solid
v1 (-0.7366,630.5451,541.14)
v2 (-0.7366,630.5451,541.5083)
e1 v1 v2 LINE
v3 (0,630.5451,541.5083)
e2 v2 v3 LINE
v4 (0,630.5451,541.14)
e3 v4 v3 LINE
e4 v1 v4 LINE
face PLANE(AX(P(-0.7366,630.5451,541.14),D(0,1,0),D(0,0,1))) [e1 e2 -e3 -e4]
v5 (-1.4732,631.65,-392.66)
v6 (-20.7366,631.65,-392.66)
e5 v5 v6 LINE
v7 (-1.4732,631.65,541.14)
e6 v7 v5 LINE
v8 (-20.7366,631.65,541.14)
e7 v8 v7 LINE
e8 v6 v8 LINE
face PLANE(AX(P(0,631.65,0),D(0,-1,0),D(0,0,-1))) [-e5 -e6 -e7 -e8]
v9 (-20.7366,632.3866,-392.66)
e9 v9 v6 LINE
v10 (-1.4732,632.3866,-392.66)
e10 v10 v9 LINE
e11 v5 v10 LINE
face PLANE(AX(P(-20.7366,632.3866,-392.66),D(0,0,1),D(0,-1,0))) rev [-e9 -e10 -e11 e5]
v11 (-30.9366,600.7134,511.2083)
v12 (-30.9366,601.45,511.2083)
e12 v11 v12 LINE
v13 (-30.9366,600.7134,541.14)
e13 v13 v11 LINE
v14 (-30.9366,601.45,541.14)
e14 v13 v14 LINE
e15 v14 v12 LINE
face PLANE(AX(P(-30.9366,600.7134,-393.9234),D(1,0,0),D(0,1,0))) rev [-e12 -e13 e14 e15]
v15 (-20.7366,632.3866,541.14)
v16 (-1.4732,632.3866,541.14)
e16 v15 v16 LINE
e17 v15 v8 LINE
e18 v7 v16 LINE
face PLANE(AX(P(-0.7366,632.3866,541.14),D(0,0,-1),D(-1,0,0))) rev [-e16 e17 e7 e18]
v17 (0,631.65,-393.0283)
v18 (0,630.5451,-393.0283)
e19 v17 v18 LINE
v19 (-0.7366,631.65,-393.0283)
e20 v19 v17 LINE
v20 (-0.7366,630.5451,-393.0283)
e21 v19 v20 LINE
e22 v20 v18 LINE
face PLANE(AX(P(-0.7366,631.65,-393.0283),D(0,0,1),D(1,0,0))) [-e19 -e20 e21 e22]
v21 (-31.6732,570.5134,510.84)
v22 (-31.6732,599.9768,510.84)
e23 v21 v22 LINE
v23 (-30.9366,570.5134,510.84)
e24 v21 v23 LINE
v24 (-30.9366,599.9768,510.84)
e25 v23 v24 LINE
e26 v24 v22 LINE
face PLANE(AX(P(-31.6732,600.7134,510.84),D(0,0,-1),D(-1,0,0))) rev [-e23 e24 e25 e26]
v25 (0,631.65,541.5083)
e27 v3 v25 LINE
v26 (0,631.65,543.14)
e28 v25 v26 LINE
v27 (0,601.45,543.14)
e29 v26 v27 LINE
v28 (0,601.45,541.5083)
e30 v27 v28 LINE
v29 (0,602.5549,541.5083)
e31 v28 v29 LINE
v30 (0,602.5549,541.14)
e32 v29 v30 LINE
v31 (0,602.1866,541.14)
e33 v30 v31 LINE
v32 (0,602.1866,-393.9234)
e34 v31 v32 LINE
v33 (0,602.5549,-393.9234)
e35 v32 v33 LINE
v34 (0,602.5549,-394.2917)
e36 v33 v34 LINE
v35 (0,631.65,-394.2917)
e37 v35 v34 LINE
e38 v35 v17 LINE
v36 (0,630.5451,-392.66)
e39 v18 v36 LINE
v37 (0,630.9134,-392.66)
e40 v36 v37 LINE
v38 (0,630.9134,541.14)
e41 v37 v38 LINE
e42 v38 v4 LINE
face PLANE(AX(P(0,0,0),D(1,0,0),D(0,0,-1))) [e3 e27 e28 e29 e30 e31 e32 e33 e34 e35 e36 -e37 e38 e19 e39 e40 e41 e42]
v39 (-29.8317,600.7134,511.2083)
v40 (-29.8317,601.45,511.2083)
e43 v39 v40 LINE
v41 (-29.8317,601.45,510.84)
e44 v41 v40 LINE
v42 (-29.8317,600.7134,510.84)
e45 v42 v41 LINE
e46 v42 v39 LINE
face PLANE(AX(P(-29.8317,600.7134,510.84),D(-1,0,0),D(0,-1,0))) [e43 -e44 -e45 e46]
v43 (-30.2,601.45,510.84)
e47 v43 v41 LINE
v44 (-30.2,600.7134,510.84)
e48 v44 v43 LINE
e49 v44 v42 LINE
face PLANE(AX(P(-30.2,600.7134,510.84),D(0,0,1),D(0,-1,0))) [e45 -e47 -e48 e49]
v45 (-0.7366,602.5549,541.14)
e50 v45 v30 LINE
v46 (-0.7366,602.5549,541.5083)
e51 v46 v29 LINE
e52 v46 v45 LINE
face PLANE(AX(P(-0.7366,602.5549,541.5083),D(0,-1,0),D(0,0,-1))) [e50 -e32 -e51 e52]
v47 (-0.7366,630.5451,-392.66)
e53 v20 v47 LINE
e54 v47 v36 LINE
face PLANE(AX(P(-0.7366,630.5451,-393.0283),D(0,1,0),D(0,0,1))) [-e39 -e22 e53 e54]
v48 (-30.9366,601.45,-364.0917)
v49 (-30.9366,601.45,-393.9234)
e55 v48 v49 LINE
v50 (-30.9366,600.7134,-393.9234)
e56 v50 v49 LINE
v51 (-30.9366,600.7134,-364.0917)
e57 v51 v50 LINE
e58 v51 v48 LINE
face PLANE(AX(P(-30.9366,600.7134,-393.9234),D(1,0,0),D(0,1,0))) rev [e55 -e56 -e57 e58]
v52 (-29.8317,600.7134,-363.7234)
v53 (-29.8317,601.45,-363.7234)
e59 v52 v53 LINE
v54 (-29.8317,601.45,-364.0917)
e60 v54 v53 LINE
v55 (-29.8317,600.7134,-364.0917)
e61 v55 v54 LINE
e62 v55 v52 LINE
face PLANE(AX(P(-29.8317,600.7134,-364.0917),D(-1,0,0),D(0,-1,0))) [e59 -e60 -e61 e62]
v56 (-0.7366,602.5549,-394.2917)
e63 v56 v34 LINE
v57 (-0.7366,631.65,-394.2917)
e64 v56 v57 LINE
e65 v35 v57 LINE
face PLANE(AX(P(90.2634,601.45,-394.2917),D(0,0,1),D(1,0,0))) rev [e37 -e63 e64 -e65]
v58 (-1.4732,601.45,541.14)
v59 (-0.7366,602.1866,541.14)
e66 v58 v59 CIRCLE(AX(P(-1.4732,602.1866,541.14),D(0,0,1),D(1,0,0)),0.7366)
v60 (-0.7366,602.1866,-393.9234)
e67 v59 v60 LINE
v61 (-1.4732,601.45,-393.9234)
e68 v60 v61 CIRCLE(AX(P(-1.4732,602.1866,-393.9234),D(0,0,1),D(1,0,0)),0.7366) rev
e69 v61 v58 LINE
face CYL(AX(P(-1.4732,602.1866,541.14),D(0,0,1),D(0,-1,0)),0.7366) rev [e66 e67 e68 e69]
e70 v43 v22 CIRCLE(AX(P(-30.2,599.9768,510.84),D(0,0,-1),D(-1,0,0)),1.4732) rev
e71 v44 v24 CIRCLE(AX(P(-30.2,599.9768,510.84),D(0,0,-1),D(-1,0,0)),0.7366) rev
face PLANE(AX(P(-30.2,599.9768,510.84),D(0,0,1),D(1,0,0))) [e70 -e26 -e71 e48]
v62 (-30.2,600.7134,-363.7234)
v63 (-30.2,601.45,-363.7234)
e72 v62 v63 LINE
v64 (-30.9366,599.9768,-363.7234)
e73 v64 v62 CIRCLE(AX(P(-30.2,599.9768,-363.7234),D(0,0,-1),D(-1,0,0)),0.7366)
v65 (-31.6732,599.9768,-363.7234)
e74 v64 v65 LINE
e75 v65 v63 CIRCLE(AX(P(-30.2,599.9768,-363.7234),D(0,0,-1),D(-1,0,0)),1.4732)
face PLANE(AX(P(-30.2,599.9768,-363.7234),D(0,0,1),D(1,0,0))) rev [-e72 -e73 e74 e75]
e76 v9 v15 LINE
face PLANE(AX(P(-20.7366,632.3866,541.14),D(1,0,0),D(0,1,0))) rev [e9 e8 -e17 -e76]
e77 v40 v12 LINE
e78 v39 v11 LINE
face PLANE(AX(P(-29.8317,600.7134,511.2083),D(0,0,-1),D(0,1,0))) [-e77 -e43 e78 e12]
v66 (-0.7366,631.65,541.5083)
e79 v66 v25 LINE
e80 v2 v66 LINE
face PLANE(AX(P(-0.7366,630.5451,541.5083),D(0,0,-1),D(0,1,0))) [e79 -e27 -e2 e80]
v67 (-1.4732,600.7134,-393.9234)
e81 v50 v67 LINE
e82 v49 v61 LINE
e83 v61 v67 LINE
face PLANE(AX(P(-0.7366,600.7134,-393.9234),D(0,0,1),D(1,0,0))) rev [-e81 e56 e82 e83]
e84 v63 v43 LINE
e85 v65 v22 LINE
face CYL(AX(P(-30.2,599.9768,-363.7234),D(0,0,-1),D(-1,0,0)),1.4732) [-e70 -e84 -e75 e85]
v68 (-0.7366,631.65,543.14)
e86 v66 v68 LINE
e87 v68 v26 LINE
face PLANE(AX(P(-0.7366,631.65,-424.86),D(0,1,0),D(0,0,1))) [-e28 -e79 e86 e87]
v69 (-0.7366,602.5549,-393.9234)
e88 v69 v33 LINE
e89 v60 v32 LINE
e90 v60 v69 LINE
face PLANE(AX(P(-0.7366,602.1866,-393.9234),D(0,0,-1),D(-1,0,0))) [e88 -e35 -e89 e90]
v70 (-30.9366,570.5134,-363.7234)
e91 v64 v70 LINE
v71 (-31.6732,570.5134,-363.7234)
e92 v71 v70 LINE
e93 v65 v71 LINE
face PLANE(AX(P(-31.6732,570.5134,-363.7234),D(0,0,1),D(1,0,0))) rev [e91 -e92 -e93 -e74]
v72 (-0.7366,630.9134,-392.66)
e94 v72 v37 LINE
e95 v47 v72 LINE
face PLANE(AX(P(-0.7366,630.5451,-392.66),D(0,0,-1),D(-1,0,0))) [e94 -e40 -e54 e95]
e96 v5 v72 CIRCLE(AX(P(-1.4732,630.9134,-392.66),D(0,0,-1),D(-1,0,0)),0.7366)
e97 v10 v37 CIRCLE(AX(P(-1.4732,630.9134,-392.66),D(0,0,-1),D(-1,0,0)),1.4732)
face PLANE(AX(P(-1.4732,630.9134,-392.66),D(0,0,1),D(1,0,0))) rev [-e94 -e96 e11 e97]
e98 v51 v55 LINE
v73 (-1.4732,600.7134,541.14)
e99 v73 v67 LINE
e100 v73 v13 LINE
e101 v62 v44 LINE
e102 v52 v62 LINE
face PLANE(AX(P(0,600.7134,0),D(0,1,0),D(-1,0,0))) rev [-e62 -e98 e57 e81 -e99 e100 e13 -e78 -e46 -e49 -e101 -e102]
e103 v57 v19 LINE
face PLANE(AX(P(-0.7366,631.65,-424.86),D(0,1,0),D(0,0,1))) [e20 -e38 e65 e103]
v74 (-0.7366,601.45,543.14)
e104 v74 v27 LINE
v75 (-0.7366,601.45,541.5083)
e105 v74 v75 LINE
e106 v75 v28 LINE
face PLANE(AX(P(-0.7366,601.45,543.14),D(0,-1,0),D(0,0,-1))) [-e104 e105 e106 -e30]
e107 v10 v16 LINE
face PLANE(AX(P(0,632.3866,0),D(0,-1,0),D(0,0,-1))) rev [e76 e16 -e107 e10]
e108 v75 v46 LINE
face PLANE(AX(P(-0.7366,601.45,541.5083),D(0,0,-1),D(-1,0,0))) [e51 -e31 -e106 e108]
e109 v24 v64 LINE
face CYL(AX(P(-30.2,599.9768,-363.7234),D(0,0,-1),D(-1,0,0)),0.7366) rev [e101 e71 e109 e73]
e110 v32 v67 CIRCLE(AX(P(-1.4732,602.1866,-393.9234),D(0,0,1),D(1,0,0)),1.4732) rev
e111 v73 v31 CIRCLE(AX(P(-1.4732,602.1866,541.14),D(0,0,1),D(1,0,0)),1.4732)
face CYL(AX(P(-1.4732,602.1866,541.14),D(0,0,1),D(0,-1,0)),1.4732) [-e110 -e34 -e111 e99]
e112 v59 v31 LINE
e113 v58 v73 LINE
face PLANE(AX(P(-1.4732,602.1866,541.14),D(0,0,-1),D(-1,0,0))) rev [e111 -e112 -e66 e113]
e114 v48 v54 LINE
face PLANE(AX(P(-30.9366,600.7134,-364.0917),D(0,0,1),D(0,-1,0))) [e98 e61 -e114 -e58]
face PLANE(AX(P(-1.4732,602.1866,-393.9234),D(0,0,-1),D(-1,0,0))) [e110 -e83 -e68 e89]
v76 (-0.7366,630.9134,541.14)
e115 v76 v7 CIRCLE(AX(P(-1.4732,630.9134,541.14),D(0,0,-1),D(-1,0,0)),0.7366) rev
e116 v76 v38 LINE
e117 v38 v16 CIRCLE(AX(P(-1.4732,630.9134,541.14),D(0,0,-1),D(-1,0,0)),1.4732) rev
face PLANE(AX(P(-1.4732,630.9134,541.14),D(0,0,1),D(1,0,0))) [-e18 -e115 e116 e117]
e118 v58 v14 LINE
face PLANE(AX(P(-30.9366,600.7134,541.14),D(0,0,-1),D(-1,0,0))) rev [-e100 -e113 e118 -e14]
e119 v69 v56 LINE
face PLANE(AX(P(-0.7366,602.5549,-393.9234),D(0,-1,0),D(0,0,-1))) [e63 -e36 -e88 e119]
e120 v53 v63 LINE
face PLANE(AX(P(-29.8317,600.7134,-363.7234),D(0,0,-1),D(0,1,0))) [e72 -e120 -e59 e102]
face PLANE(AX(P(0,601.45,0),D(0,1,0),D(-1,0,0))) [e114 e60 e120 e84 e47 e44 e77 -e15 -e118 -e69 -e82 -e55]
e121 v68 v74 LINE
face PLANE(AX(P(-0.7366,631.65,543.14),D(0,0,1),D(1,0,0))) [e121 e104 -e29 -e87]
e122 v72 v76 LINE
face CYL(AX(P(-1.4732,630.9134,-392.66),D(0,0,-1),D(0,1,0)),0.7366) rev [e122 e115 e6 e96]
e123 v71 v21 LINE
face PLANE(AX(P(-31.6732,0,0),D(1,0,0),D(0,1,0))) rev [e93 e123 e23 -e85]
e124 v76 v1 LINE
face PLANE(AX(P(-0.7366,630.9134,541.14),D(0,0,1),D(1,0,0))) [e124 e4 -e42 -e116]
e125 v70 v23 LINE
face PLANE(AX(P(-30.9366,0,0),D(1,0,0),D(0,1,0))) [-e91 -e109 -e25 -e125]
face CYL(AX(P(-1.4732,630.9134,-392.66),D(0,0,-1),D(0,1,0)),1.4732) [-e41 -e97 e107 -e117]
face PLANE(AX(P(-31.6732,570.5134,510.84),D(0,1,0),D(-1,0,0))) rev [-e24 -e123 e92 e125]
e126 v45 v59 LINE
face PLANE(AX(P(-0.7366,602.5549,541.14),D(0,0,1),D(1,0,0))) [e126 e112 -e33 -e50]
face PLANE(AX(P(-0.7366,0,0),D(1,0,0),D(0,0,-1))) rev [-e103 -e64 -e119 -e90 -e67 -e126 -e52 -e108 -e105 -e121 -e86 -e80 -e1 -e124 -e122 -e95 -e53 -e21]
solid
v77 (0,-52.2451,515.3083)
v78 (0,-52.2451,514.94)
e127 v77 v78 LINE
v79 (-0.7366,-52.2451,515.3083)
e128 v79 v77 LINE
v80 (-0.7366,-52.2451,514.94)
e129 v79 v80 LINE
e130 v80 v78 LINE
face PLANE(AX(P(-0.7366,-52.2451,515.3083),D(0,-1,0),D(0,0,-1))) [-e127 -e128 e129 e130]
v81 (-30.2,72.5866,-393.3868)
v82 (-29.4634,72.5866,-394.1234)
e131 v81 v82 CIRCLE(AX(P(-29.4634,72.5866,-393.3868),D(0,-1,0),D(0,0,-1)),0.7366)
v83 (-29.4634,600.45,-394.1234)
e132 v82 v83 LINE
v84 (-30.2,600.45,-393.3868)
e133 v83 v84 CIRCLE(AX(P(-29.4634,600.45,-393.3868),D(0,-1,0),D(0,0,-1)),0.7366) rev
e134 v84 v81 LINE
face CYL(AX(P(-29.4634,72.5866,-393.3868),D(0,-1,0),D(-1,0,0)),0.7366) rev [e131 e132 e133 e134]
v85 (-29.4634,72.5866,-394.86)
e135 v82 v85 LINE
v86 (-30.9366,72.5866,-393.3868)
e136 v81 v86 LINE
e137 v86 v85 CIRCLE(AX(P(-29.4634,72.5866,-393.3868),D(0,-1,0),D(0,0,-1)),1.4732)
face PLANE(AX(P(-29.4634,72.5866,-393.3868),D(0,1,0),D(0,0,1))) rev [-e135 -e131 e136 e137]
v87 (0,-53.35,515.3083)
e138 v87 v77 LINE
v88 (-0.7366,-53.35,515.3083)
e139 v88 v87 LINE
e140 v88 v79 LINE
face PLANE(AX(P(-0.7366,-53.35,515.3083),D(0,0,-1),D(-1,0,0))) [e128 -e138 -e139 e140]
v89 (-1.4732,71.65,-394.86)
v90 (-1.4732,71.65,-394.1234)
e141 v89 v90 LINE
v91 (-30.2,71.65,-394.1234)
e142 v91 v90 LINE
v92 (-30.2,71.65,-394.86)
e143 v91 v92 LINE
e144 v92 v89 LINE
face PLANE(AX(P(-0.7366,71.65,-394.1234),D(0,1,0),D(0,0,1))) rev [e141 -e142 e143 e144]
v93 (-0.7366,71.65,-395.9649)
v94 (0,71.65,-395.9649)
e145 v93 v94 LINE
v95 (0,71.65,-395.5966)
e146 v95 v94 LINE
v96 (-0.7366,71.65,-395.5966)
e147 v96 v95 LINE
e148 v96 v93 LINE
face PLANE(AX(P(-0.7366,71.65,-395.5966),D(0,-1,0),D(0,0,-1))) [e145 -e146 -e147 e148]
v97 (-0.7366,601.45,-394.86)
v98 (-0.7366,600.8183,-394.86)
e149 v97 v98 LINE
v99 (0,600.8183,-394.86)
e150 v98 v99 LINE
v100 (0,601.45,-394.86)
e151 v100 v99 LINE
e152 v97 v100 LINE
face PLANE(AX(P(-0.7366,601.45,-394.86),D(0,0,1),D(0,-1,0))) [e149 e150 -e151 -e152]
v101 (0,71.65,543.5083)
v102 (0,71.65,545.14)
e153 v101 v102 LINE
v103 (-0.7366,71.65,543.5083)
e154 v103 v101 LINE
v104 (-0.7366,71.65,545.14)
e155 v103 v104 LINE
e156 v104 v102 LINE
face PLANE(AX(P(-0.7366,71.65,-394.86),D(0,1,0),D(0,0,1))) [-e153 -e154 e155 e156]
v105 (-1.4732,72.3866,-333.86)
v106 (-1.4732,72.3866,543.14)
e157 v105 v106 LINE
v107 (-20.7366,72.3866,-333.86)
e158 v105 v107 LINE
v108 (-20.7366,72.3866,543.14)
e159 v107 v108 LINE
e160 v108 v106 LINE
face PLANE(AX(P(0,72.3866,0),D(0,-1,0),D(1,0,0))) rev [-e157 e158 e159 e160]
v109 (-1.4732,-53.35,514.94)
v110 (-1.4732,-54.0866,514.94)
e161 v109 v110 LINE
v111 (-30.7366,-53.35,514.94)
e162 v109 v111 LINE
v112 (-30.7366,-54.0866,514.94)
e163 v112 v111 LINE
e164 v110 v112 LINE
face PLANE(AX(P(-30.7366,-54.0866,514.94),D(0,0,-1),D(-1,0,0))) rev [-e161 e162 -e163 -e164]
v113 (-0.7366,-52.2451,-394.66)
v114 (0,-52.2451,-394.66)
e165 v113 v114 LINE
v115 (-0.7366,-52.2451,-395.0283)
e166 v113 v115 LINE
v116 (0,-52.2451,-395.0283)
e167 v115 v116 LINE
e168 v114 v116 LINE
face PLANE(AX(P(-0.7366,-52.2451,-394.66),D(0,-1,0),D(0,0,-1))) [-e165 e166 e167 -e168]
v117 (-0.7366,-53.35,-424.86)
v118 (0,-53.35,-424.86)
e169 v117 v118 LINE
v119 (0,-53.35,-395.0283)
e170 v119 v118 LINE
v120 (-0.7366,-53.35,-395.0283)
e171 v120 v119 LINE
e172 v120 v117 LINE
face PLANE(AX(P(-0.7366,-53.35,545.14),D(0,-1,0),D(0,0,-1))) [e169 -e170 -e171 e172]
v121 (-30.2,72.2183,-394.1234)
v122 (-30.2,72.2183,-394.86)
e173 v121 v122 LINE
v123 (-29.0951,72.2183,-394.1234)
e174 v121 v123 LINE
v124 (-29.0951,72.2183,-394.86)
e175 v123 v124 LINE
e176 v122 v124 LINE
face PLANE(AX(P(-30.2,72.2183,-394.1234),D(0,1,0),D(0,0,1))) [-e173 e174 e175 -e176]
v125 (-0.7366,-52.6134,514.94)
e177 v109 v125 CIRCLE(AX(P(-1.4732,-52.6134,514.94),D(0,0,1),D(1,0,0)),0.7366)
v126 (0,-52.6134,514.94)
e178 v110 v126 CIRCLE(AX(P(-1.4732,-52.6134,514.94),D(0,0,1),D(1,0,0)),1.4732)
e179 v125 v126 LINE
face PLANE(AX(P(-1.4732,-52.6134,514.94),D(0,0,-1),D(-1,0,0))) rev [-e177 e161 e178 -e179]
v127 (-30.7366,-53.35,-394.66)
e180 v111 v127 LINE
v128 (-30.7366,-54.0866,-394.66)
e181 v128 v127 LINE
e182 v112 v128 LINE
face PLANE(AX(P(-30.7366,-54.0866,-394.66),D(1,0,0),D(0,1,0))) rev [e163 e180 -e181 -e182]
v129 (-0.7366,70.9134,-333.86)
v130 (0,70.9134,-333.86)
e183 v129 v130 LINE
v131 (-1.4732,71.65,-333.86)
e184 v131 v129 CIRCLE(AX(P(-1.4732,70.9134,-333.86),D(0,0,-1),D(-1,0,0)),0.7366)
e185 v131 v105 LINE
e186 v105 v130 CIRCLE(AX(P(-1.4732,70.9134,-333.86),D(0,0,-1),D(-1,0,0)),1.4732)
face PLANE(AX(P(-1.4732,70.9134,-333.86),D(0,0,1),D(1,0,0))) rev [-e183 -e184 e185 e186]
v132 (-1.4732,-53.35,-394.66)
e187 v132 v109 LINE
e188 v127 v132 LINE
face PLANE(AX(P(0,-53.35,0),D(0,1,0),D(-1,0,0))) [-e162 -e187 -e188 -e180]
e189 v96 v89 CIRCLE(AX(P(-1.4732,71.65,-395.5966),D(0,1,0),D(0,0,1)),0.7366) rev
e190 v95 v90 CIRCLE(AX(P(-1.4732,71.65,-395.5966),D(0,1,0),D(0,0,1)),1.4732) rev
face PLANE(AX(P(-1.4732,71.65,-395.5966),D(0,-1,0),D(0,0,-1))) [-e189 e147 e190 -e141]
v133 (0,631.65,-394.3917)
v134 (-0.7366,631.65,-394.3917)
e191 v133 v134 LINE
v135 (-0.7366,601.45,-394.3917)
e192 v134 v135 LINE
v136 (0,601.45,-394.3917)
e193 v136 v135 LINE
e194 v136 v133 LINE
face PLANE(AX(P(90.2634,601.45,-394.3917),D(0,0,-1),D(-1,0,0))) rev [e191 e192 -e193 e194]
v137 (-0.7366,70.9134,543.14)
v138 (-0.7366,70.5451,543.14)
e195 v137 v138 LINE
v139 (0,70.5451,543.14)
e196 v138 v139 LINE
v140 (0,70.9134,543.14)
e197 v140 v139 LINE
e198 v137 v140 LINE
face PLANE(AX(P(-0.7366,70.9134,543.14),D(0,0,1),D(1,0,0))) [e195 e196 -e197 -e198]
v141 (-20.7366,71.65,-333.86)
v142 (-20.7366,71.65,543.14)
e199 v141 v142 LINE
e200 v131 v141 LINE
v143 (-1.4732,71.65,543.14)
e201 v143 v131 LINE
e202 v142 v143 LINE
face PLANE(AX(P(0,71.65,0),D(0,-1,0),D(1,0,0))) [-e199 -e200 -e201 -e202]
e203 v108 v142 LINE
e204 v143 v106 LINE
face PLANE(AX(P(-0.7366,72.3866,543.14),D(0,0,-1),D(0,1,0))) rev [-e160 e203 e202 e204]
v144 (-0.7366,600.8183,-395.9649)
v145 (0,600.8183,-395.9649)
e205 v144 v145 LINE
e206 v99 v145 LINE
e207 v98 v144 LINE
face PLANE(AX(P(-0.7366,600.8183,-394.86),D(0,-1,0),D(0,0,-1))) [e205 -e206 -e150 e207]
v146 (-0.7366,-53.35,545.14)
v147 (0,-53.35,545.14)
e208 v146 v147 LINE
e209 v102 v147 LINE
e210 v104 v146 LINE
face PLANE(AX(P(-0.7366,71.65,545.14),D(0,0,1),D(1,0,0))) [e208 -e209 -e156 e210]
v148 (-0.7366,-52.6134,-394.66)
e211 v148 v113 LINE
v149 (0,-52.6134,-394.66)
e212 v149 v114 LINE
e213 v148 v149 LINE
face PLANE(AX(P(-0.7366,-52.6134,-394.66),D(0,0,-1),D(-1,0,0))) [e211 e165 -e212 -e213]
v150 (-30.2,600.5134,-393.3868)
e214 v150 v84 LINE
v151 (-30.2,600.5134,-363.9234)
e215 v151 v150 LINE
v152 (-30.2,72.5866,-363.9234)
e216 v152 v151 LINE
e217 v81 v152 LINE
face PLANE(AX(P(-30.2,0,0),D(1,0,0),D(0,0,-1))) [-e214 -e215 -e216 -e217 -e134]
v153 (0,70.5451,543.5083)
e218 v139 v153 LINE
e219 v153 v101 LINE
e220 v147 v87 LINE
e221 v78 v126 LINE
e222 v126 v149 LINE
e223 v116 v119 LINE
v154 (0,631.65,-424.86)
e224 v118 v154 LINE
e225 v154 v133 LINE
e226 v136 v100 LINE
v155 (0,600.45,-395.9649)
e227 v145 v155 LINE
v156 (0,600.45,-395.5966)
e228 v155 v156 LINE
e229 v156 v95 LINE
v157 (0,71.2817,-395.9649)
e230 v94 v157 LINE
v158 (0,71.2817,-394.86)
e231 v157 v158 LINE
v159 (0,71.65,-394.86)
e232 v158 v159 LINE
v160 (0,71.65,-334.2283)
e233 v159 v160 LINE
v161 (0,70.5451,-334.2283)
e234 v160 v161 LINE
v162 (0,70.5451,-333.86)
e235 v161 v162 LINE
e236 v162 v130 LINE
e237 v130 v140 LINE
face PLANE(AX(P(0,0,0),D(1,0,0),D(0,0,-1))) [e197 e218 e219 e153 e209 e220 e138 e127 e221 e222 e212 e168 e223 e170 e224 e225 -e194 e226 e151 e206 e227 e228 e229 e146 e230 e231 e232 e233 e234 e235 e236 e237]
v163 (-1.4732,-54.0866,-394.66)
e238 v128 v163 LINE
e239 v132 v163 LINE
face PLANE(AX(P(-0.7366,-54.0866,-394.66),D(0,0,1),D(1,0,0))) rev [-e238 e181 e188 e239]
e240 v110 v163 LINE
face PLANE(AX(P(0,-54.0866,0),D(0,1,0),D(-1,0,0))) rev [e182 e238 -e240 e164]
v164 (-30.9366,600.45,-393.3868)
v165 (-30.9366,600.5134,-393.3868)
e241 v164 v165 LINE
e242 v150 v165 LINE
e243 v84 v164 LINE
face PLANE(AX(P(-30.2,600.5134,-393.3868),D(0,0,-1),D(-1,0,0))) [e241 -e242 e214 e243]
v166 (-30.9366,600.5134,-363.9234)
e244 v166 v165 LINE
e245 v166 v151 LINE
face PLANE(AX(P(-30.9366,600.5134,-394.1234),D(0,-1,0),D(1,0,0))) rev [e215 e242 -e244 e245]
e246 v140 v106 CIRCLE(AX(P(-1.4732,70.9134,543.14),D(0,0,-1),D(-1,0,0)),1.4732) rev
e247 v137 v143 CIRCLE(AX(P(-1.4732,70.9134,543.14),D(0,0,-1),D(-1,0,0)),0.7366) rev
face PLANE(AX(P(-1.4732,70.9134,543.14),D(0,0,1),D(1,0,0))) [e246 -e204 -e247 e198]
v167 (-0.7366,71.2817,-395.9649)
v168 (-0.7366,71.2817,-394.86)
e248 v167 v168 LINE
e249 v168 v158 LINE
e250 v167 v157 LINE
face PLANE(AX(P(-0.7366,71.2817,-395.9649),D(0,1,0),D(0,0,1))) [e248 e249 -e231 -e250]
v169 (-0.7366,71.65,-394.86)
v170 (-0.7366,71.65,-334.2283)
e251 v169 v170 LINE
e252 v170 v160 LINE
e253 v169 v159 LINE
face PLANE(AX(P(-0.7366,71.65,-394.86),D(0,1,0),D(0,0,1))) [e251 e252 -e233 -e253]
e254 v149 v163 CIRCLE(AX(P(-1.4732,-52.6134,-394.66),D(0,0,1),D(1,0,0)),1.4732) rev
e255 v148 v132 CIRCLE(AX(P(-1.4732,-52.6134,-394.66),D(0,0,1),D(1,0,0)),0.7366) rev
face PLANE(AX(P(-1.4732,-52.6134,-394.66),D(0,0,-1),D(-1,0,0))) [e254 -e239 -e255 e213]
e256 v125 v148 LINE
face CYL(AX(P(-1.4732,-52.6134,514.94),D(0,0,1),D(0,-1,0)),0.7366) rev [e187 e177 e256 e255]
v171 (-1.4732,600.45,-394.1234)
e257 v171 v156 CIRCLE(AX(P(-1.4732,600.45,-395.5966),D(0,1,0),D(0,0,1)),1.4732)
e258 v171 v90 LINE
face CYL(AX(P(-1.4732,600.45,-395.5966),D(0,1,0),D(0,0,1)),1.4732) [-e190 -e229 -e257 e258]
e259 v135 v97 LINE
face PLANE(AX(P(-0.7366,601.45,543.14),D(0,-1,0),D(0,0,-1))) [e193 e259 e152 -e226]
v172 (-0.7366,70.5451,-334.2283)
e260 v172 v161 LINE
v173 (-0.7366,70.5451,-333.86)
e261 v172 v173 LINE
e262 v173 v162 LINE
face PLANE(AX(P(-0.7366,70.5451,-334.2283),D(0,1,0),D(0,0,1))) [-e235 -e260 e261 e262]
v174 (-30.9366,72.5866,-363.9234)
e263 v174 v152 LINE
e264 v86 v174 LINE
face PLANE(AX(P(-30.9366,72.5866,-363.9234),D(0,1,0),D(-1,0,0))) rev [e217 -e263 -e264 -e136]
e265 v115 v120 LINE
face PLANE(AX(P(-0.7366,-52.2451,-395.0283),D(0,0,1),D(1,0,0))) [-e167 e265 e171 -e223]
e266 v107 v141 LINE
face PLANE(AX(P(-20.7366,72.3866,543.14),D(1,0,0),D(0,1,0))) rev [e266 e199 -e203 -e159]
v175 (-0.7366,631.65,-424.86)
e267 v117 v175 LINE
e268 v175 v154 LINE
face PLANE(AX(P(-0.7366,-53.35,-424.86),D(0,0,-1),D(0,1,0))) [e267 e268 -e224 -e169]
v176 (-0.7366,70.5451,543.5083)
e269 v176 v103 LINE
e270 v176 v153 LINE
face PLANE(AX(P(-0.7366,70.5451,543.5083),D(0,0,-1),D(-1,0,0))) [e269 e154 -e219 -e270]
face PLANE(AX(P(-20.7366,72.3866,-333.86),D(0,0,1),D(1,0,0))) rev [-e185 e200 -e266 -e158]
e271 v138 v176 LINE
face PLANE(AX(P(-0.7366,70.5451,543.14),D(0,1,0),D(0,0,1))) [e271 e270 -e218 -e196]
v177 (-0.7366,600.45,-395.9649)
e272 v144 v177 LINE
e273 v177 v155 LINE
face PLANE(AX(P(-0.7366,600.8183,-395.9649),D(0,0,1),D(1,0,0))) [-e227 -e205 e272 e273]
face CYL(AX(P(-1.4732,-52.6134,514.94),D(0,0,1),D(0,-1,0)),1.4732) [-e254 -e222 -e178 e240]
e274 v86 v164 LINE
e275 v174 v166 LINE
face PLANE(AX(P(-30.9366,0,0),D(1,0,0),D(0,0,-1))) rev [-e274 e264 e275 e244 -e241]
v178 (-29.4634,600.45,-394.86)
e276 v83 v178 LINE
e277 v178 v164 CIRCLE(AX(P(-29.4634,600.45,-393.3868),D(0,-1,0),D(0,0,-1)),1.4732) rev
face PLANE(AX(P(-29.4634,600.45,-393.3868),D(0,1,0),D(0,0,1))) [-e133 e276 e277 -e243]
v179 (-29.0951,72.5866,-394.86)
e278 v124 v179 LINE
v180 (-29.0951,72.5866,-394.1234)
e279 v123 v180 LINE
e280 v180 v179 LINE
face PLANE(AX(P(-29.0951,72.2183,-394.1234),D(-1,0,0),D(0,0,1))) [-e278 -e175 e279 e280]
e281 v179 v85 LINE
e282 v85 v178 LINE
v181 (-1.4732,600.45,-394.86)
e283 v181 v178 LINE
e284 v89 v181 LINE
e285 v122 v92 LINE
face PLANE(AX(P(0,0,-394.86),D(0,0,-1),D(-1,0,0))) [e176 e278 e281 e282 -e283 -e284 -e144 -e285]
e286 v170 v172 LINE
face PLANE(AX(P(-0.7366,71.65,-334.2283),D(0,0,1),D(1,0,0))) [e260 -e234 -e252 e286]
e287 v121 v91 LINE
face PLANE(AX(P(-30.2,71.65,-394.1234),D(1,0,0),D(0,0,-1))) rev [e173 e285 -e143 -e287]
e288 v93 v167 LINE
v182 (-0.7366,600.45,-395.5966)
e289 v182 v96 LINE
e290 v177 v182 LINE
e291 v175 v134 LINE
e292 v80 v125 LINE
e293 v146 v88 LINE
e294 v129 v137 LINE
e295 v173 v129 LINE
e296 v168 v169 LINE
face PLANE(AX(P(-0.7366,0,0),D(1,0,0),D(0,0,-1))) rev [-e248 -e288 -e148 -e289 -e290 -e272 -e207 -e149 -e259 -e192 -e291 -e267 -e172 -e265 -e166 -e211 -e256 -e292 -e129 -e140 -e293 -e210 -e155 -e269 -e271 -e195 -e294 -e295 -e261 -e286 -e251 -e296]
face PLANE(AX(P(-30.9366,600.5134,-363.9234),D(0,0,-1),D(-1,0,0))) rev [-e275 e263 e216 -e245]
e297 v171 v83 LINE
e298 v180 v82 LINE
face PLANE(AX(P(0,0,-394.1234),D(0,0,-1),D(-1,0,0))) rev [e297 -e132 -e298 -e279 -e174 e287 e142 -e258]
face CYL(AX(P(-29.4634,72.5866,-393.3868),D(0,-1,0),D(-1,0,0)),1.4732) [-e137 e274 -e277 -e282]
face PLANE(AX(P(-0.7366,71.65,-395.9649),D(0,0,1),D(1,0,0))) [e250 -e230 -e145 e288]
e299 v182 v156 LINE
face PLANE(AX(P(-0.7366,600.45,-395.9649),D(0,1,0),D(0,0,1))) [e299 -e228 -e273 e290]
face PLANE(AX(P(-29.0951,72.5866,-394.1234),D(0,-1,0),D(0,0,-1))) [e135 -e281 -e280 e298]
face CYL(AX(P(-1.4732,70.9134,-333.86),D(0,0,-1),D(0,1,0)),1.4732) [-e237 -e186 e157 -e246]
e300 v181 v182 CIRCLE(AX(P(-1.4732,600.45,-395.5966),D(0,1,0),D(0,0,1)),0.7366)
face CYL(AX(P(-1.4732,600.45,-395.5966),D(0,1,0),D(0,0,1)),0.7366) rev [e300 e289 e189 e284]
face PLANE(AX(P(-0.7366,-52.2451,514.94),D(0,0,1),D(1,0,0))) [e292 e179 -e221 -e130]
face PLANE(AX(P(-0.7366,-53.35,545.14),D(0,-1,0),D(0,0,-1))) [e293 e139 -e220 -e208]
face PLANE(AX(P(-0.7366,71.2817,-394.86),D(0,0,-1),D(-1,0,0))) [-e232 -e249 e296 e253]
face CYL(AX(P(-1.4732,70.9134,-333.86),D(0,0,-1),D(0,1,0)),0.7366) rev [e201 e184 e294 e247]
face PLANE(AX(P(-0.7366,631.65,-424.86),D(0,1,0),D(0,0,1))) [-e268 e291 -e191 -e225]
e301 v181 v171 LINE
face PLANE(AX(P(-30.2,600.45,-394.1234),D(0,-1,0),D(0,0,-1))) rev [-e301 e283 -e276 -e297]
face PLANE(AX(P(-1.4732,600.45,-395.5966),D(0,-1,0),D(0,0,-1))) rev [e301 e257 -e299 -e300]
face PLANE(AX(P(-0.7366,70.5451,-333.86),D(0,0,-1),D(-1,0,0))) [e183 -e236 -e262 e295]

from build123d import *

# Parameters (mm, degrees)
BASE_FLANGE1_DEPTH             = 0.7366
EDGE_FLANGE1_STRIP_W           = 4.4196
EDGE_FLANGE1_STRIP_H           = 0.7366
EDGE_FLANGE1_STRIP_CUT_DEPTH   = 877
EDGE_FLANGE1_RELIEF_W          = 4.7879
EDGE_FLANGE1_RELIEF_H          = 0.3683
EDGE_FLANGE1_RELIEF_CUT_DEPTH  = 0.7366
EDGE_FLANGE1_DEPTH             = 877
EDGE_FLANGE2_START             = 71.2817
EDGE_FLANGE2_DEPTH             = 529.5366
EDGE_FLANGE2_2_DEPTH           = 0.3683
EDGE_FLANGE2_START_2           = 600.45
EDGE_FLANGE2_3_DEPTH           = 0.3683
EDGE_FLANGE2_START_3           = 71.65
EDGE_FLANGE2_4_DEPTH           = 528.8
EDGE_FLANGE3_STRIP_W           = 4.4196
EDGE_FLANGE3_STRIP_H           = 0.7366
EDGE_FLANGE3_STRIP_CUT_DEPTH   = 935.0634
EDGE_FLANGE3_RELIEF_W          = 4.7879
EDGE_FLANGE3_RELIEF_H          = 0.3683
EDGE_FLANGE3_RELIEF_CUT_DEPTH  = 0.7366
EDGE_FLANGE3_DEPTH             = 935.0634
EDGE_FLANGE4_STRIP_W           = 4.4196
EDGE_FLANGE4_STRIP_H           = 0.7366
EDGE_FLANGE4_STRIP_CUT_DEPTH   = 933.8
EDGE_FLANGE4_RELIEF_W          = 4.7879
EDGE_FLANGE4_RELIEF_H          = 0.3683
EDGE_FLANGE4_RELIEF_CUT_DEPTH  = 0.7366
EDGE_FLANGE4_DEPTH             = 933.8
EDGE_FLANGE10_STRIP_W          = 4.4196
EDGE_FLANGE10_STRIP_H          = 0.7366
EDGE_FLANGE10_STRIP_CUT_DEPTH  = 874.5634
EDGE_FLANGE10_RELIEF_W         = 4.7879
EDGE_FLANGE10_RELIEF_H         = 0.3683
EDGE_FLANGE10_RELIEF_CUT_DEPTH = 0.7366
EDGE_FLANGE10_DEPTH            = 874.5634
EDGE_FLANGE11_STRIP_W          = 4.4196
EDGE_FLANGE11_STRIP_H          = 0.7366
EDGE_FLANGE11_STRIP_CUT_DEPTH  = 527.8634
EDGE_FLANGE11_RELIEF_W         = 4.7879
EDGE_FLANGE11_RELIEF_H         = 0.3683
EDGE_FLANGE11_RELIEF_CUT_DEPTH = 0.7366
EDGE_FLANGE11_DEPTH            = 527.8634
EDGE_FLANGE11_START            = 0.7366
EDGE_FLANGE11_PROFILE_W        = 527.9268
EDGE_FLANGE11_PROFILE_H        = 29.4634
EDGE_FLANGE11_FLAT_DEPTH       = 0.7366
EDGE_FLANGE13_STRIP_W          = 4.4196
EDGE_FLANGE13_STRIP_H          = 0.7366
EDGE_FLANGE13_STRIP_CUT_DEPTH  = 909.6
EDGE_FLANGE13_RELIEF_W         = 4.7879
EDGE_FLANGE13_RELIEF_H         = 0.3683
EDGE_FLANGE13_RELIEF_CUT_DEPTH = 0.7366
EDGE_FLANGE13_DEPTH            = 909.6
SKETCH44_W                     = 0.1
SKETCH44_H                     = 30.2
CUT_EXTRUDE16_DEPTH            = 91


with BuildPart() as part:
    # Base-Flange1: sheet metal written as solids
    # Sketch1 → Base-Flange1 (new body)
    with BuildSketch(Plane(origin=(0, 0, 0), x_dir=(0, 0, -1), z_dir=(1, 0, 0))):
        Polygon((-545.14, 71.65), (-545.14, -53.35), (424.86, -53.35), (424.86, 631.65), (-543.14, 631.65), (-543.14, 601.45), (394.86, 601.45), (394.86, 71.65), align=None)
    extrude(amount=-BASE_FLANGE1_DEPTH)

    # Edge-Flange1: sheet metal written as solids
    # Edge-Flange1 strip (on a plane across the edge) → Edge-Flange1 strip cut (cut)
    with BuildSketch(Plane(origin=(-0.7366, 71.65, 543.14), x_dir=(0, -1, 0), z_dir=(0, 0, -1))):
        with Locations((-1.4732, -0.3683)):
            Rectangle(EDGE_FLANGE1_STRIP_W, EDGE_FLANGE1_STRIP_H)
    extrude(amount=EDGE_FLANGE1_STRIP_CUT_DEPTH, mode=Mode.SUBTRACT)

    # Edge-Flange1 relief (on the sheet) → Edge-Flange1 relief cut (cut)
    with BuildSketch(Plane(origin=(-0.7366, 70.9134, 543.14), x_dir=(0, -1, 0), z_dir=(-1, 0, 0))):
        with Locations((-2.02565, 0.18415)):
            Rectangle(EDGE_FLANGE1_RELIEF_W, EDGE_FLANGE1_RELIEF_H)
        with Locations((-2.02565, -877.18415)):
            Rectangle(EDGE_FLANGE1_RELIEF_W, EDGE_FLANGE1_RELIEF_H)
    extrude(amount=-EDGE_FLANGE1_RELIEF_CUT_DEPTH, mode=Mode.SUBTRACT)

    # Edge-Flange1 section (on a plane across the edge) → Edge-Flange1 (add)
    with BuildSketch(Plane(origin=(-0.7366, 71.65, 543.14), x_dir=(0, -1, 0), z_dir=(0, 0, -1))):
        with BuildLine():
            Line((-0.7366, 0.7366), (-0.7366, 20))
            Line((-0.7366, 20), (0, 20))
            Line((0, 20), (0, 0.7366))
            ThreePointArc((0, 0.7366), (0.215745145, 0.215745145), (0.7366, 0))
            Line((0.7366, 0), (0.7366, -0.7366))
            ThreePointArc((0.7366, -0.7366), (-0.30510971, -0.30510971), (-0.7366, 0.7366))
        make_face()
    extrude(amount=EDGE_FLANGE1_DEPTH)

    # Edge-Flange2: read off the stored shape, not the designer's step
    # Edge-Flange2 outline → Edge-Flange2 (cut)
    with BuildSketch(Plane(origin=(0, 0, 0), x_dir=(1, 0, 0), z_dir=(0, 1, 0)).offset(EDGE_FLANGE2_START)):
        with BuildLine():
            Line((0, 394.86), (0, 395.5966))
            ThreePointArc((0, 395.5966), (-0.050198073, 395.215307783), (-0.197371375, 394.86))
            Line((-0.197371375, 394.86), (0, 394.86))
        make_face()
    extrude(amount=EDGE_FLANGE2_DEPTH, mode=Mode.SUBTRACT)

    # Edge-Flange2 2 outline → Edge-Flange2 2 (cut)
    with BuildSketch(Plane(origin=(0, 0, 0), x_dir=(1, 0, 0), z_dir=(0, 1, 0)).offset(EDGE_FLANGE2_START)):
        with BuildLine():
            Line((0, 395.5966), (0, 395.9649))
            Line((0, 395.9649), (-0.7366, 395.9649))
            Line((-0.7366, 395.9649), (-0.7366, 394.86))
            Line((-0.7366, 394.86), (-0.197371375, 394.86))
            ThreePointArc((-0.197371375, 394.86), (-0.050198073, 395.215307783), (0, 395.5966))
        make_face()
    extrude(amount=EDGE_FLANGE2_2_DEPTH, mode=Mode.SUBTRACT)

    # Edge-Flange2 3 outline → Edge-Flange2 3 (cut)
    with BuildSketch(Plane(origin=(0, 0, 0), x_dir=(1, 0, 0), z_dir=(0, 1, 0)).offset(EDGE_FLANGE2_START_2)):
        with BuildLine():
            Line((0, 395.5966), (0, 395.9649))
            Line((0, 395.9649), (-0.7366, 395.9649))
            Line((-0.7366, 395.9649), (-0.7366, 394.86))
            Line((-0.7366, 394.86), (-0.197371375, 394.86))
            ThreePointArc((-0.197371375, 394.86), (-0.050198073, 395.215307783), (0, 395.5966))
        make_face()
    extrude(amount=EDGE_FLANGE2_3_DEPTH, mode=Mode.SUBTRACT)

    # Edge-Flange2 4 outline → Edge-Flange2 4 (add)
    with BuildSketch(Plane(origin=(0, 0, 0), x_dir=(1, 0, 0), z_dir=(0, 1, 0)).offset(EDGE_FLANGE2_START_3)):
        with BuildLine():
            Line((-0.7366, 394.86), (-0.7366, 395.5966))
            ThreePointArc((-0.7366, 395.5966), (-0.952345145, 395.075745145), (-1.4732, 394.86))
            Line((-1.4732, 394.86), (-30.2, 394.86))
            Line((-30.2, 394.86), (-30.2, 394.1234))
            Line((-30.2, 394.1234), (-1.4732, 394.1234))
            ThreePointArc((-1.4732, 394.1234), (-0.7366, 394.320771375), (-0.197371375, 394.86))
            Line((-0.197371375, 394.86), (-0.7366, 394.86))
        make_face()
    extrude(amount=EDGE_FLANGE2_4_DEPTH)

    # Edge-Flange3: sheet metal written as solids
    # Edge-Flange3 strip (on a plane across the edge) → Edge-Flange3 strip cut (cut)
    with BuildSketch(Plane(origin=(-0.7366, 601.45, -393.9234), x_dir=(0, 1, 0), z_dir=(0, 0, 1))):
        with Locations((-1.4732, -0.3683)):
            Rectangle(EDGE_FLANGE3_STRIP_W, EDGE_FLANGE3_STRIP_H)
    extrude(amount=EDGE_FLANGE3_STRIP_CUT_DEPTH, mode=Mode.SUBTRACT)

    # Edge-Flange3 relief (on the sheet) → Edge-Flange3 relief cut (cut)
    with BuildSketch(Plane(origin=(-0.7366, 602.1866, -393.9234), x_dir=(0, 1, 0), z_dir=(-1, 0, 0))):
        with Locations((-2.02565, 0.18415)):
            Rectangle(EDGE_FLANGE3_RELIEF_W, EDGE_FLANGE3_RELIEF_H)
        with Locations((-2.02565, -935.24755)):
            Rectangle(EDGE_FLANGE3_RELIEF_W, EDGE_FLANGE3_RELIEF_H)
    extrude(amount=-EDGE_FLANGE3_RELIEF_CUT_DEPTH, mode=Mode.SUBTRACT)

    # Edge-Flange3 section (on a plane across the edge) → Edge-Flange3 (add)
    with BuildSketch(Plane(origin=(-0.7366, 601.45, -393.9234), x_dir=(0, 1, 0), z_dir=(0, 0, 1))):
        with BuildLine():
            Line((-0.7366, 0.7366), (-0.7366, 30.2))
            Line((-0.7366, 30.2), (0, 30.2))
            Line((0, 30.2), (0, 0.7366))
            ThreePointArc((0, 0.7366), (0.215745145, 0.215745145), (0.7366, 0))
            Line((0.7366, 0), (0.7366, -0.7366))
            ThreePointArc((0.7366, -0.7366), (-0.30510971, -0.30510971), (-0.7366, 0.7366))
        make_face()
    extrude(amount=EDGE_FLANGE3_DEPTH)

    # Edge-Flange4: sheet metal written as solids
    # Edge-Flange4 strip (on a plane across the edge) → Edge-Flange4 strip cut (cut)
    with BuildSketch(Plane(origin=(-0.7366, 631.65, 541.14), x_dir=(0, -1, 0), z_dir=(0, 0, -1))):
        with Locations((-1.4732, -0.3683)):
            Rectangle(EDGE_FLANGE4_STRIP_W, EDGE_FLANGE4_STRIP_H)
    extrude(amount=EDGE_FLANGE4_STRIP_CUT_DEPTH, mode=Mode.SUBTRACT)

    # Edge-Flange4 relief (on the sheet) → Edge-Flange4 relief cut (cut)
    with BuildSketch(Plane(origin=(-0.7366, 630.9134, 541.14), x_dir=(0, -1, 0), z_dir=(-1, 0, 0))):
        with Locations((-2.02565, 0.18415)):
            Rectangle(EDGE_FLANGE4_RELIEF_W, EDGE_FLANGE4_RELIEF_H)
        with Locations((-2.02565, -933.98415)):
            Rectangle(EDGE_FLANGE4_RELIEF_W, EDGE_FLANGE4_RELIEF_H)
    extrude(amount=-EDGE_FLANGE4_RELIEF_CUT_DEPTH, mode=Mode.SUBTRACT)

    # Edge-Flange4 section (on a plane across the edge) → Edge-Flange4 (add)
    with BuildSketch(Plane(origin=(-0.7366, 631.65, 541.14), x_dir=(0, -1, 0), z_dir=(0, 0, -1))):
        with BuildLine():
            Line((-0.7366, 0.7366), (-0.7366, 20))
            Line((-0.7366, 20), (0, 20))
            Line((0, 20), (0, 0.7366))
            ThreePointArc((0, 0.7366), (0.215745145, 0.215745145), (0.7366, 0))
            Line((0.7366, 0), (0.7366, -0.7366))
            ThreePointArc((0.7366, -0.7366), (-0.30510971, -0.30510971), (-0.7366, 0.7366))
        make_face()
    extrude(amount=EDGE_FLANGE4_DEPTH)

    # Edge-Flange10: sheet metal written as solids
    # Edge-Flange10 strip (on a plane across the edge) → Edge-Flange10 strip cut (cut)
    with BuildSketch(Plane(origin=(-30.9366, 600.7134, 510.84), x_dir=(1, 0, 0), z_dir=(0, 0, -1))):
        with Locations((-1.4732, -0.3683)):
            Rectangle(EDGE_FLANGE10_STRIP_W, EDGE_FLANGE10_STRIP_H)
    extrude(amount=EDGE_FLANGE10_STRIP_CUT_DEPTH, mode=Mode.SUBTRACT)

    # Edge-Flange10 relief (on the sheet) → Edge-Flange10 relief cut (cut)
    with BuildSketch(Plane(origin=(-30.2, 600.7134, 510.84), x_dir=(1, 0, 0), z_dir=(0, -1, 0))):
        with Locations((-2.02565, 0.18415)):
            Rectangle(EDGE_FLANGE10_RELIEF_W, EDGE_FLANGE10_RELIEF_H)
        with Locations((-2.02565, -874.74755)):
            Rectangle(EDGE_FLANGE10_RELIEF_W, EDGE_FLANGE10_RELIEF_H)
    extrude(amount=-EDGE_FLANGE10_RELIEF_CUT_DEPTH, mode=Mode.SUBTRACT)

    # Edge-Flange10 section (on a plane across the edge) → Edge-Flange10 (add)
    with BuildSketch(Plane(origin=(-30.9366, 600.7134, 510.84), x_dir=(1, 0, 0), z_dir=(0, 0, -1))):
        with BuildLine():
            Line((-0.7366, 0.7366), (-0.7366, 30.2))
            Line((-0.7366, 30.2), (0, 30.2))
            Line((0, 30.2), (0, 0.7366))
            ThreePointArc((0, 0.7366), (0.215745145, 0.215745145), (0.7366, 0))
            Line((0.7366, 0), (0.7366, -0.7366))
            ThreePointArc((0.7366, -0.7366), (-0.30510971, -0.30510971), (-0.7366, 0.7366))
        make_face()
    extrude(amount=EDGE_FLANGE10_DEPTH)

    # Edge-Flange11: sheet metal written as solids
    # Edge-Flange11 strip (on a plane across the edge) → Edge-Flange11 strip cut (cut)
    with BuildSketch(Plane(origin=(-30.2, 600.45, -394.1234), x_dir=(1, 0, 0), z_dir=(0, -1, 0))):
        with Locations((-1.4732, -0.3683)):
            Rectangle(EDGE_FLANGE11_STRIP_W, EDGE_FLANGE11_STRIP_H)
    extrude(amount=EDGE_FLANGE11_STRIP_CUT_DEPTH, mode=Mode.SUBTRACT)

    # Edge-Flange11 relief (on the sheet) → Edge-Flange11 relief cut (cut)
    with BuildSketch(Plane(origin=(-29.4634, 600.45, -394.1234), x_dir=(1, 0, 0), z_dir=(0, 0, 1))):
        with Locations((-2.02565, -528.04755)):
            Rectangle(EDGE_FLANGE11_RELIEF_W, EDGE_FLANGE11_RELIEF_H)
    extrude(amount=-EDGE_FLANGE11_RELIEF_CUT_DEPTH, mode=Mode.SUBTRACT)

    # Edge-Flange11 bend section (on a plane across the edge) → Edge-Flange11 (add)
    with BuildSketch(Plane(origin=(-30.2, 600.45, -394.1234), x_dir=(1, 0, 0), z_dir=(0, -1, 0))):
        with BuildLine():
            Line((-0.7366, 0.7366), (0, 0.7366))
            ThreePointArc((0, 0.7366), (0.215745145, 0.215745145), (0.7366, 0))
            Line((0.7366, 0), (0.7366, -0.7366))
            ThreePointArc((0.7366, -0.7366), (-0.30510971, -0.30510971), (-0.7366, 0.7366))
        make_face()
    extrude(amount=EDGE_FLANGE11_DEPTH)

    # Edge-Flange11 profile (on flange) → Edge-Flange11 flat (add)
    with BuildSketch(Plane(origin=(-30.2, 0, -394.1234), x_dir=(0, -1, 0), z_dir=(-1, 0, 0)).offset(EDGE_FLANGE11_START)):
        with Locations((-336.55, 15.4683)):
            Rectangle(EDGE_FLANGE11_PROFILE_W, EDGE_FLANGE11_PROFILE_H)
    extrude(amount=-EDGE_FLANGE11_FLAT_DEPTH)

    # Edge-Flange13: sheet metal written as solids
    # Edge-Flange13 strip (on a plane across the edge) → Edge-Flange13 strip cut (cut)
    with BuildSketch(Plane(origin=(-0.7366, -53.35, -394.66), x_dir=(0, 1, 0), z_dir=(0, 0, 1))):
        with Locations((-1.4732, -0.3683)):
            Rectangle(EDGE_FLANGE13_STRIP_W, EDGE_FLANGE13_STRIP_H)
    extrude(amount=EDGE_FLANGE13_STRIP_CUT_DEPTH, mode=Mode.SUBTRACT)

    # Edge-Flange13 relief (on the sheet) → Edge-Flange13 relief cut (cut)
    with BuildSketch(Plane(origin=(-0.7366, -52.6134, -394.66), x_dir=(0, 1, 0), z_dir=(-1, 0, 0))):
        with Locations((-2.02565, 0.18415)):
            Rectangle(EDGE_FLANGE13_RELIEF_W, EDGE_FLANGE13_RELIEF_H)
        with Locations((-2.02565, -909.78415)):
            Rectangle(EDGE_FLANGE13_RELIEF_W, EDGE_FLANGE13_RELIEF_H)
    extrude(amount=-EDGE_FLANGE13_RELIEF_CUT_DEPTH, mode=Mode.SUBTRACT)

    # Edge-Flange13 section (on a plane across the edge) → Edge-Flange13 (add)
    with BuildSketch(Plane(origin=(-0.7366, -53.35, -394.66), x_dir=(0, 1, 0), z_dir=(0, 0, 1))):
        with BuildLine():
            Line((-0.7366, 0.7366), (-0.7366, 30))
            Line((-0.7366, 30), (0, 30))
            Line((0, 30), (0, 0.7366))
            ThreePointArc((0, 0.7366), (0.215745145, 0.215745145), (0.7366, 0))
            Line((0.7366, 0), (0.7366, -0.7366))
            ThreePointArc((0.7366, -0.7366), (-0.30510971, -0.30510971), (-0.7366, 0.7366))
        make_face()
    extrude(amount=EDGE_FLANGE13_DEPTH)

    # Sketch44 → Cut-Extrude16 (cut)
    with BuildSketch(Plane.ZY.offset(0.7366)):
        with Locations((-394.3417, 616.55)):
            Rectangle(SKETCH44_W, SKETCH44_H)
    extrude(amount=-CUT_EXTRUDE16_DEPTH, mode=Mode.SUBTRACT)


with BuildPart() as cut_extrude16_piece_1:
    # of the separate pieces the step leaves, piece 1, a body of its own (cut_extrude16_pieces)
    add(part.part.solids().sort_by_distance((0, 71.65, 545.14))[0])


with BuildPart() as cut_extrude16_piece_2:
    # of the separate pieces the step leaves, piece 2, a body of its own (cut_extrude16_pieces)
    add(part.part.solids().sort_by_distance((0, 602.5549, -393.9234))[0])


solid = Compound([cut_extrude16_piece_1.part, cut_extrude16_piece_2.part])
